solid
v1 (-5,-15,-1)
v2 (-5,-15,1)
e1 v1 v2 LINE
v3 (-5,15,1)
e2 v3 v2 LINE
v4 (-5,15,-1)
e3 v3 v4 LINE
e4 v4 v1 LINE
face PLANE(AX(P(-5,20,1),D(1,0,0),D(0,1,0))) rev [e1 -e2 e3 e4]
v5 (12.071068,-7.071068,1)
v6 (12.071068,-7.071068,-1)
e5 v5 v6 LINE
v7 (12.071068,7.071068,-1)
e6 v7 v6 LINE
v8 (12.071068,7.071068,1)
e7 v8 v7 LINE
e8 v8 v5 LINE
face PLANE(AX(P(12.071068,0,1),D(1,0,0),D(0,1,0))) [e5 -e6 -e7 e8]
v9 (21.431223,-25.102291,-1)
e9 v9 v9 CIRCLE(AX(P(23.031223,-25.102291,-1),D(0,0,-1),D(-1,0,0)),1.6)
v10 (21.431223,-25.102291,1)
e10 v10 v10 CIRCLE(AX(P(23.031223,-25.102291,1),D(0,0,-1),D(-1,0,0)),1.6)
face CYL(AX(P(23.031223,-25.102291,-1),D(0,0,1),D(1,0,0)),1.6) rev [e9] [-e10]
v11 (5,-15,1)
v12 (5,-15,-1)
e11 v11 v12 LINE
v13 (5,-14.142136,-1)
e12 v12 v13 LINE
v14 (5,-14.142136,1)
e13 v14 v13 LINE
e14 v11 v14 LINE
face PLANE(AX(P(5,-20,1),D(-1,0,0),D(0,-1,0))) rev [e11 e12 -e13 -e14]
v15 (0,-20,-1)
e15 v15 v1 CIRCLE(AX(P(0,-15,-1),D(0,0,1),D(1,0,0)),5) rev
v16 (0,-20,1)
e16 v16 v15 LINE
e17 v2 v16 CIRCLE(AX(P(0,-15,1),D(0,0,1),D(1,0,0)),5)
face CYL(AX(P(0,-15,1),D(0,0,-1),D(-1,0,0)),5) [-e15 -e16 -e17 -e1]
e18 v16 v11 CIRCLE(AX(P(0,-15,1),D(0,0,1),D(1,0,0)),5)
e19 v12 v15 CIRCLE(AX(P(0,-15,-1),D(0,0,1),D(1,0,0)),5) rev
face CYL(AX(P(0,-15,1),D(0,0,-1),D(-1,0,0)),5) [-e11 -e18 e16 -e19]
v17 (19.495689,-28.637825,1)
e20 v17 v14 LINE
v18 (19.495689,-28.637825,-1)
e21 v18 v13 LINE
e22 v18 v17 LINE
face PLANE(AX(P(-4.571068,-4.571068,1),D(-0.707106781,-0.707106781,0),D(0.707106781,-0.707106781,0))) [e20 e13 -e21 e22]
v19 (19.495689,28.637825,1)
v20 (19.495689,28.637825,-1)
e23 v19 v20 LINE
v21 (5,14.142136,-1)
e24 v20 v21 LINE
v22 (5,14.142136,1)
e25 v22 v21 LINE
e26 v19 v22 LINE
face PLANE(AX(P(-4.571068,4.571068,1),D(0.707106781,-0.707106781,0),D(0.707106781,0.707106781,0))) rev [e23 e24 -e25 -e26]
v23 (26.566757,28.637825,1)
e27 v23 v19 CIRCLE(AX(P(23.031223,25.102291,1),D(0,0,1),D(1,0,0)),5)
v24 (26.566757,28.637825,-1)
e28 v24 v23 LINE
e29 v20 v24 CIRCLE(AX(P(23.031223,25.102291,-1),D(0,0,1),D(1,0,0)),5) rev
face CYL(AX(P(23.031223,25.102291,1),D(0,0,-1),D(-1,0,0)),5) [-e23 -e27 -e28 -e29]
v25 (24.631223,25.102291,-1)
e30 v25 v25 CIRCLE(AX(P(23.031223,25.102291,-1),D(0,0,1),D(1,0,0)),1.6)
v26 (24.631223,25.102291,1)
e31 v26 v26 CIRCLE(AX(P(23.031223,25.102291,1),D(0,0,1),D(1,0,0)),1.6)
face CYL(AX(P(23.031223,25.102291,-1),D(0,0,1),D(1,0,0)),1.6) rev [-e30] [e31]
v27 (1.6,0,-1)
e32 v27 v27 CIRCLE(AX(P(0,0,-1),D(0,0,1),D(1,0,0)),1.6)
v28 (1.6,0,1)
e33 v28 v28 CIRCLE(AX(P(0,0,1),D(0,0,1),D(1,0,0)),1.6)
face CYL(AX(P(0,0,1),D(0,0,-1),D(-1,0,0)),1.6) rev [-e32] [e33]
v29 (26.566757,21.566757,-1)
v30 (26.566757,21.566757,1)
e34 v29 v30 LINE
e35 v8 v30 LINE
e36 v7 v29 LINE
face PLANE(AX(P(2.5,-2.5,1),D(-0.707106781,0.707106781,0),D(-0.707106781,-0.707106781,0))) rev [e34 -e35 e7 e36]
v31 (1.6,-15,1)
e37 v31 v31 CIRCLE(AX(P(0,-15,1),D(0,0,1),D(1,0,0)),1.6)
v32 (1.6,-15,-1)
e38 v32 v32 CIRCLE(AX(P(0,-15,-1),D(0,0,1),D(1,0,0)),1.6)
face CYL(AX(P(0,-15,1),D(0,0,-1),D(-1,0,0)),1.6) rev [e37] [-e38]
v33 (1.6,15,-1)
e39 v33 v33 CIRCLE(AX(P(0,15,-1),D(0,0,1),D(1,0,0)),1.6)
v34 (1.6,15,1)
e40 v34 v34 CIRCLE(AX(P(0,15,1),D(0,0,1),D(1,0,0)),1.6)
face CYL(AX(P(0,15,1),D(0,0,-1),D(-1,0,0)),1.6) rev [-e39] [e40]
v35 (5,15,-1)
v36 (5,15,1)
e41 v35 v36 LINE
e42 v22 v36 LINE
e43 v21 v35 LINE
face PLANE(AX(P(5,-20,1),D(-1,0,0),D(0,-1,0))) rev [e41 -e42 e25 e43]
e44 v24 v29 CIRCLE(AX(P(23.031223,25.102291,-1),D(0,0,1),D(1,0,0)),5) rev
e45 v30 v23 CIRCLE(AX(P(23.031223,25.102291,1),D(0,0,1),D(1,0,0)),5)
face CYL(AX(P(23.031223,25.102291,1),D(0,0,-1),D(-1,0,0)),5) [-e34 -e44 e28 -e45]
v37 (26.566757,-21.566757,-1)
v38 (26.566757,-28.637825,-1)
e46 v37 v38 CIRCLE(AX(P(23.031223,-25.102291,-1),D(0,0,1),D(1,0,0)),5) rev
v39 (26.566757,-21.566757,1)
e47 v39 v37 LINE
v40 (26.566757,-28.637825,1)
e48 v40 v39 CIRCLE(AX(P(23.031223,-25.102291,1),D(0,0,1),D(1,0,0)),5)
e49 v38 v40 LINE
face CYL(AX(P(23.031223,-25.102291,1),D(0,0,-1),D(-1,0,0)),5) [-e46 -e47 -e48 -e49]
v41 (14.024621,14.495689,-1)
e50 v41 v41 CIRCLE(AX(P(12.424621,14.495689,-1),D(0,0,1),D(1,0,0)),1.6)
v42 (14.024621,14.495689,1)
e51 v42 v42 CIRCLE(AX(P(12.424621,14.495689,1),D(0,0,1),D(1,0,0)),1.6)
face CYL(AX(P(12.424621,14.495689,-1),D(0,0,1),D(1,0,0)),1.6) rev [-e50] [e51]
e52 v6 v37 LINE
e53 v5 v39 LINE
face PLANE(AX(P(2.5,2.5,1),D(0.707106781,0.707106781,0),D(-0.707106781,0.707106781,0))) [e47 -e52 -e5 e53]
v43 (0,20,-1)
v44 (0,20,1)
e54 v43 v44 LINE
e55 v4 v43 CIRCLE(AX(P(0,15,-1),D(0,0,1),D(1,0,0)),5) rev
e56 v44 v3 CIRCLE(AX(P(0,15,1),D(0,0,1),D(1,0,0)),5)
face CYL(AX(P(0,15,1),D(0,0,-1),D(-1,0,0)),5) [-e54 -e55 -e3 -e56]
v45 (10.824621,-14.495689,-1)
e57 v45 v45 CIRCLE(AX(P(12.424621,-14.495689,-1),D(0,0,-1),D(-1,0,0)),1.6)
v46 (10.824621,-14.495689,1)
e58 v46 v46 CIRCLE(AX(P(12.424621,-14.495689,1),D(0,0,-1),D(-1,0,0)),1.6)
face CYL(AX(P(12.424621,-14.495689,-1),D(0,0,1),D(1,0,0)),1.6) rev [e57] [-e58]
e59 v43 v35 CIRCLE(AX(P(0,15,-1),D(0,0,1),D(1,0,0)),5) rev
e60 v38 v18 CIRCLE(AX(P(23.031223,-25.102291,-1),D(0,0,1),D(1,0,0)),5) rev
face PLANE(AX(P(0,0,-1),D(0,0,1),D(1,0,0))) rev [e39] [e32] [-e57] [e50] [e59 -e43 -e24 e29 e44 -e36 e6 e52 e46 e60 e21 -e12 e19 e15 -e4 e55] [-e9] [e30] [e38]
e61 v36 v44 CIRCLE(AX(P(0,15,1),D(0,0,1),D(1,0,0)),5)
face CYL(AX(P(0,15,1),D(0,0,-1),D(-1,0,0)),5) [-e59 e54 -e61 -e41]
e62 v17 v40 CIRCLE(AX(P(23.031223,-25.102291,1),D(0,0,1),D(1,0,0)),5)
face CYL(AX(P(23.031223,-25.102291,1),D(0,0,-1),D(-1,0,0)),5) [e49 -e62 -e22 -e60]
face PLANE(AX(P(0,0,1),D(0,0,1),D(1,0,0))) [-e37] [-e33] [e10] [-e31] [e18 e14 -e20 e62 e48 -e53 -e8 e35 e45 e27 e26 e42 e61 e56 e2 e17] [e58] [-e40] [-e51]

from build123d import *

# Parameters (mm, degrees)
SKETCH_1_R          = 1.6
EXTRUDE_1_DEPTH     = 1
SKETCH_2_R          = 1.6
CUT_EXTRUDE_1_DEPTH = 45.10524807
FILLET_1_R          = 5


with BuildPart() as part:
    # ｽｹｯﾁ1 → ﾎﾞｽ - 押し出し1 (new, symmetric)
    with BuildSketch(Plane.XY):
        Polygon((5, 20), (-5, 20), (-5, -20), (5, -20), (5, -14.142135624), (23.03122292, -32.173358544), (30.102290732, -25.102290732), (12.071067812, -7.071067812), (12.071067812, 7.071067812), (30.102290732, 25.102290732), (23.03122292, 32.173358544), (5, 14.142135624), align=None)
        with Locations((0, -15)):
            Circle(SKETCH_1_R, mode=Mode.SUBTRACT)
        Circle(SKETCH_1_R, mode=Mode.SUBTRACT)
        with Locations((0, 15)):
            Circle(SKETCH_1_R, mode=Mode.SUBTRACT)
    extrude(amount=EXTRUDE_1_DEPTH, both=True)

    # ｽｹｯﾁ2 → ｶｯﾄ - 押し出し1 (cut, through all)
    with BuildSketch(Plane.XY.offset(1)):
        with Locations((12.424621202, 14.495689014)):
            Circle(SKETCH_2_R)
        with Locations((23.03122292, 25.102290732)):
            Circle(SKETCH_2_R)
        with Locations(Location((12.424621202, -14.495689014, 0), (0, 0, 180))):
            Circle(SKETCH_2_R)
        with Locations(Location((23.03122292, -25.102290732, 0), (0, 0, 180))):
            Circle(SKETCH_2_R)
    extrude(amount=-CUT_EXTRUDE_1_DEPTH, mode=Mode.SUBTRACT)

    # ﾌｨﾚｯﾄ1
    fillet_1_edges = [part.edges().sort_by_distance(p)[0] for p in [
        (5, -20, 0),
        (-5, -20, 0),
        (23.03122292, -32.173358544, 0),
        (30.102290732, -25.102290732, 0),
        (30.102290732, 25.102290732, 0),
        (23.03122292, 32.173358544, 0),
        (5, 20, 0),
        (-5, 20, 0),
    ]]
    fillet(fillet_1_edges, radius=FILLET_1_R - 0.0001)  # a hair under: the kernel refuses the full size


solid = part.part
